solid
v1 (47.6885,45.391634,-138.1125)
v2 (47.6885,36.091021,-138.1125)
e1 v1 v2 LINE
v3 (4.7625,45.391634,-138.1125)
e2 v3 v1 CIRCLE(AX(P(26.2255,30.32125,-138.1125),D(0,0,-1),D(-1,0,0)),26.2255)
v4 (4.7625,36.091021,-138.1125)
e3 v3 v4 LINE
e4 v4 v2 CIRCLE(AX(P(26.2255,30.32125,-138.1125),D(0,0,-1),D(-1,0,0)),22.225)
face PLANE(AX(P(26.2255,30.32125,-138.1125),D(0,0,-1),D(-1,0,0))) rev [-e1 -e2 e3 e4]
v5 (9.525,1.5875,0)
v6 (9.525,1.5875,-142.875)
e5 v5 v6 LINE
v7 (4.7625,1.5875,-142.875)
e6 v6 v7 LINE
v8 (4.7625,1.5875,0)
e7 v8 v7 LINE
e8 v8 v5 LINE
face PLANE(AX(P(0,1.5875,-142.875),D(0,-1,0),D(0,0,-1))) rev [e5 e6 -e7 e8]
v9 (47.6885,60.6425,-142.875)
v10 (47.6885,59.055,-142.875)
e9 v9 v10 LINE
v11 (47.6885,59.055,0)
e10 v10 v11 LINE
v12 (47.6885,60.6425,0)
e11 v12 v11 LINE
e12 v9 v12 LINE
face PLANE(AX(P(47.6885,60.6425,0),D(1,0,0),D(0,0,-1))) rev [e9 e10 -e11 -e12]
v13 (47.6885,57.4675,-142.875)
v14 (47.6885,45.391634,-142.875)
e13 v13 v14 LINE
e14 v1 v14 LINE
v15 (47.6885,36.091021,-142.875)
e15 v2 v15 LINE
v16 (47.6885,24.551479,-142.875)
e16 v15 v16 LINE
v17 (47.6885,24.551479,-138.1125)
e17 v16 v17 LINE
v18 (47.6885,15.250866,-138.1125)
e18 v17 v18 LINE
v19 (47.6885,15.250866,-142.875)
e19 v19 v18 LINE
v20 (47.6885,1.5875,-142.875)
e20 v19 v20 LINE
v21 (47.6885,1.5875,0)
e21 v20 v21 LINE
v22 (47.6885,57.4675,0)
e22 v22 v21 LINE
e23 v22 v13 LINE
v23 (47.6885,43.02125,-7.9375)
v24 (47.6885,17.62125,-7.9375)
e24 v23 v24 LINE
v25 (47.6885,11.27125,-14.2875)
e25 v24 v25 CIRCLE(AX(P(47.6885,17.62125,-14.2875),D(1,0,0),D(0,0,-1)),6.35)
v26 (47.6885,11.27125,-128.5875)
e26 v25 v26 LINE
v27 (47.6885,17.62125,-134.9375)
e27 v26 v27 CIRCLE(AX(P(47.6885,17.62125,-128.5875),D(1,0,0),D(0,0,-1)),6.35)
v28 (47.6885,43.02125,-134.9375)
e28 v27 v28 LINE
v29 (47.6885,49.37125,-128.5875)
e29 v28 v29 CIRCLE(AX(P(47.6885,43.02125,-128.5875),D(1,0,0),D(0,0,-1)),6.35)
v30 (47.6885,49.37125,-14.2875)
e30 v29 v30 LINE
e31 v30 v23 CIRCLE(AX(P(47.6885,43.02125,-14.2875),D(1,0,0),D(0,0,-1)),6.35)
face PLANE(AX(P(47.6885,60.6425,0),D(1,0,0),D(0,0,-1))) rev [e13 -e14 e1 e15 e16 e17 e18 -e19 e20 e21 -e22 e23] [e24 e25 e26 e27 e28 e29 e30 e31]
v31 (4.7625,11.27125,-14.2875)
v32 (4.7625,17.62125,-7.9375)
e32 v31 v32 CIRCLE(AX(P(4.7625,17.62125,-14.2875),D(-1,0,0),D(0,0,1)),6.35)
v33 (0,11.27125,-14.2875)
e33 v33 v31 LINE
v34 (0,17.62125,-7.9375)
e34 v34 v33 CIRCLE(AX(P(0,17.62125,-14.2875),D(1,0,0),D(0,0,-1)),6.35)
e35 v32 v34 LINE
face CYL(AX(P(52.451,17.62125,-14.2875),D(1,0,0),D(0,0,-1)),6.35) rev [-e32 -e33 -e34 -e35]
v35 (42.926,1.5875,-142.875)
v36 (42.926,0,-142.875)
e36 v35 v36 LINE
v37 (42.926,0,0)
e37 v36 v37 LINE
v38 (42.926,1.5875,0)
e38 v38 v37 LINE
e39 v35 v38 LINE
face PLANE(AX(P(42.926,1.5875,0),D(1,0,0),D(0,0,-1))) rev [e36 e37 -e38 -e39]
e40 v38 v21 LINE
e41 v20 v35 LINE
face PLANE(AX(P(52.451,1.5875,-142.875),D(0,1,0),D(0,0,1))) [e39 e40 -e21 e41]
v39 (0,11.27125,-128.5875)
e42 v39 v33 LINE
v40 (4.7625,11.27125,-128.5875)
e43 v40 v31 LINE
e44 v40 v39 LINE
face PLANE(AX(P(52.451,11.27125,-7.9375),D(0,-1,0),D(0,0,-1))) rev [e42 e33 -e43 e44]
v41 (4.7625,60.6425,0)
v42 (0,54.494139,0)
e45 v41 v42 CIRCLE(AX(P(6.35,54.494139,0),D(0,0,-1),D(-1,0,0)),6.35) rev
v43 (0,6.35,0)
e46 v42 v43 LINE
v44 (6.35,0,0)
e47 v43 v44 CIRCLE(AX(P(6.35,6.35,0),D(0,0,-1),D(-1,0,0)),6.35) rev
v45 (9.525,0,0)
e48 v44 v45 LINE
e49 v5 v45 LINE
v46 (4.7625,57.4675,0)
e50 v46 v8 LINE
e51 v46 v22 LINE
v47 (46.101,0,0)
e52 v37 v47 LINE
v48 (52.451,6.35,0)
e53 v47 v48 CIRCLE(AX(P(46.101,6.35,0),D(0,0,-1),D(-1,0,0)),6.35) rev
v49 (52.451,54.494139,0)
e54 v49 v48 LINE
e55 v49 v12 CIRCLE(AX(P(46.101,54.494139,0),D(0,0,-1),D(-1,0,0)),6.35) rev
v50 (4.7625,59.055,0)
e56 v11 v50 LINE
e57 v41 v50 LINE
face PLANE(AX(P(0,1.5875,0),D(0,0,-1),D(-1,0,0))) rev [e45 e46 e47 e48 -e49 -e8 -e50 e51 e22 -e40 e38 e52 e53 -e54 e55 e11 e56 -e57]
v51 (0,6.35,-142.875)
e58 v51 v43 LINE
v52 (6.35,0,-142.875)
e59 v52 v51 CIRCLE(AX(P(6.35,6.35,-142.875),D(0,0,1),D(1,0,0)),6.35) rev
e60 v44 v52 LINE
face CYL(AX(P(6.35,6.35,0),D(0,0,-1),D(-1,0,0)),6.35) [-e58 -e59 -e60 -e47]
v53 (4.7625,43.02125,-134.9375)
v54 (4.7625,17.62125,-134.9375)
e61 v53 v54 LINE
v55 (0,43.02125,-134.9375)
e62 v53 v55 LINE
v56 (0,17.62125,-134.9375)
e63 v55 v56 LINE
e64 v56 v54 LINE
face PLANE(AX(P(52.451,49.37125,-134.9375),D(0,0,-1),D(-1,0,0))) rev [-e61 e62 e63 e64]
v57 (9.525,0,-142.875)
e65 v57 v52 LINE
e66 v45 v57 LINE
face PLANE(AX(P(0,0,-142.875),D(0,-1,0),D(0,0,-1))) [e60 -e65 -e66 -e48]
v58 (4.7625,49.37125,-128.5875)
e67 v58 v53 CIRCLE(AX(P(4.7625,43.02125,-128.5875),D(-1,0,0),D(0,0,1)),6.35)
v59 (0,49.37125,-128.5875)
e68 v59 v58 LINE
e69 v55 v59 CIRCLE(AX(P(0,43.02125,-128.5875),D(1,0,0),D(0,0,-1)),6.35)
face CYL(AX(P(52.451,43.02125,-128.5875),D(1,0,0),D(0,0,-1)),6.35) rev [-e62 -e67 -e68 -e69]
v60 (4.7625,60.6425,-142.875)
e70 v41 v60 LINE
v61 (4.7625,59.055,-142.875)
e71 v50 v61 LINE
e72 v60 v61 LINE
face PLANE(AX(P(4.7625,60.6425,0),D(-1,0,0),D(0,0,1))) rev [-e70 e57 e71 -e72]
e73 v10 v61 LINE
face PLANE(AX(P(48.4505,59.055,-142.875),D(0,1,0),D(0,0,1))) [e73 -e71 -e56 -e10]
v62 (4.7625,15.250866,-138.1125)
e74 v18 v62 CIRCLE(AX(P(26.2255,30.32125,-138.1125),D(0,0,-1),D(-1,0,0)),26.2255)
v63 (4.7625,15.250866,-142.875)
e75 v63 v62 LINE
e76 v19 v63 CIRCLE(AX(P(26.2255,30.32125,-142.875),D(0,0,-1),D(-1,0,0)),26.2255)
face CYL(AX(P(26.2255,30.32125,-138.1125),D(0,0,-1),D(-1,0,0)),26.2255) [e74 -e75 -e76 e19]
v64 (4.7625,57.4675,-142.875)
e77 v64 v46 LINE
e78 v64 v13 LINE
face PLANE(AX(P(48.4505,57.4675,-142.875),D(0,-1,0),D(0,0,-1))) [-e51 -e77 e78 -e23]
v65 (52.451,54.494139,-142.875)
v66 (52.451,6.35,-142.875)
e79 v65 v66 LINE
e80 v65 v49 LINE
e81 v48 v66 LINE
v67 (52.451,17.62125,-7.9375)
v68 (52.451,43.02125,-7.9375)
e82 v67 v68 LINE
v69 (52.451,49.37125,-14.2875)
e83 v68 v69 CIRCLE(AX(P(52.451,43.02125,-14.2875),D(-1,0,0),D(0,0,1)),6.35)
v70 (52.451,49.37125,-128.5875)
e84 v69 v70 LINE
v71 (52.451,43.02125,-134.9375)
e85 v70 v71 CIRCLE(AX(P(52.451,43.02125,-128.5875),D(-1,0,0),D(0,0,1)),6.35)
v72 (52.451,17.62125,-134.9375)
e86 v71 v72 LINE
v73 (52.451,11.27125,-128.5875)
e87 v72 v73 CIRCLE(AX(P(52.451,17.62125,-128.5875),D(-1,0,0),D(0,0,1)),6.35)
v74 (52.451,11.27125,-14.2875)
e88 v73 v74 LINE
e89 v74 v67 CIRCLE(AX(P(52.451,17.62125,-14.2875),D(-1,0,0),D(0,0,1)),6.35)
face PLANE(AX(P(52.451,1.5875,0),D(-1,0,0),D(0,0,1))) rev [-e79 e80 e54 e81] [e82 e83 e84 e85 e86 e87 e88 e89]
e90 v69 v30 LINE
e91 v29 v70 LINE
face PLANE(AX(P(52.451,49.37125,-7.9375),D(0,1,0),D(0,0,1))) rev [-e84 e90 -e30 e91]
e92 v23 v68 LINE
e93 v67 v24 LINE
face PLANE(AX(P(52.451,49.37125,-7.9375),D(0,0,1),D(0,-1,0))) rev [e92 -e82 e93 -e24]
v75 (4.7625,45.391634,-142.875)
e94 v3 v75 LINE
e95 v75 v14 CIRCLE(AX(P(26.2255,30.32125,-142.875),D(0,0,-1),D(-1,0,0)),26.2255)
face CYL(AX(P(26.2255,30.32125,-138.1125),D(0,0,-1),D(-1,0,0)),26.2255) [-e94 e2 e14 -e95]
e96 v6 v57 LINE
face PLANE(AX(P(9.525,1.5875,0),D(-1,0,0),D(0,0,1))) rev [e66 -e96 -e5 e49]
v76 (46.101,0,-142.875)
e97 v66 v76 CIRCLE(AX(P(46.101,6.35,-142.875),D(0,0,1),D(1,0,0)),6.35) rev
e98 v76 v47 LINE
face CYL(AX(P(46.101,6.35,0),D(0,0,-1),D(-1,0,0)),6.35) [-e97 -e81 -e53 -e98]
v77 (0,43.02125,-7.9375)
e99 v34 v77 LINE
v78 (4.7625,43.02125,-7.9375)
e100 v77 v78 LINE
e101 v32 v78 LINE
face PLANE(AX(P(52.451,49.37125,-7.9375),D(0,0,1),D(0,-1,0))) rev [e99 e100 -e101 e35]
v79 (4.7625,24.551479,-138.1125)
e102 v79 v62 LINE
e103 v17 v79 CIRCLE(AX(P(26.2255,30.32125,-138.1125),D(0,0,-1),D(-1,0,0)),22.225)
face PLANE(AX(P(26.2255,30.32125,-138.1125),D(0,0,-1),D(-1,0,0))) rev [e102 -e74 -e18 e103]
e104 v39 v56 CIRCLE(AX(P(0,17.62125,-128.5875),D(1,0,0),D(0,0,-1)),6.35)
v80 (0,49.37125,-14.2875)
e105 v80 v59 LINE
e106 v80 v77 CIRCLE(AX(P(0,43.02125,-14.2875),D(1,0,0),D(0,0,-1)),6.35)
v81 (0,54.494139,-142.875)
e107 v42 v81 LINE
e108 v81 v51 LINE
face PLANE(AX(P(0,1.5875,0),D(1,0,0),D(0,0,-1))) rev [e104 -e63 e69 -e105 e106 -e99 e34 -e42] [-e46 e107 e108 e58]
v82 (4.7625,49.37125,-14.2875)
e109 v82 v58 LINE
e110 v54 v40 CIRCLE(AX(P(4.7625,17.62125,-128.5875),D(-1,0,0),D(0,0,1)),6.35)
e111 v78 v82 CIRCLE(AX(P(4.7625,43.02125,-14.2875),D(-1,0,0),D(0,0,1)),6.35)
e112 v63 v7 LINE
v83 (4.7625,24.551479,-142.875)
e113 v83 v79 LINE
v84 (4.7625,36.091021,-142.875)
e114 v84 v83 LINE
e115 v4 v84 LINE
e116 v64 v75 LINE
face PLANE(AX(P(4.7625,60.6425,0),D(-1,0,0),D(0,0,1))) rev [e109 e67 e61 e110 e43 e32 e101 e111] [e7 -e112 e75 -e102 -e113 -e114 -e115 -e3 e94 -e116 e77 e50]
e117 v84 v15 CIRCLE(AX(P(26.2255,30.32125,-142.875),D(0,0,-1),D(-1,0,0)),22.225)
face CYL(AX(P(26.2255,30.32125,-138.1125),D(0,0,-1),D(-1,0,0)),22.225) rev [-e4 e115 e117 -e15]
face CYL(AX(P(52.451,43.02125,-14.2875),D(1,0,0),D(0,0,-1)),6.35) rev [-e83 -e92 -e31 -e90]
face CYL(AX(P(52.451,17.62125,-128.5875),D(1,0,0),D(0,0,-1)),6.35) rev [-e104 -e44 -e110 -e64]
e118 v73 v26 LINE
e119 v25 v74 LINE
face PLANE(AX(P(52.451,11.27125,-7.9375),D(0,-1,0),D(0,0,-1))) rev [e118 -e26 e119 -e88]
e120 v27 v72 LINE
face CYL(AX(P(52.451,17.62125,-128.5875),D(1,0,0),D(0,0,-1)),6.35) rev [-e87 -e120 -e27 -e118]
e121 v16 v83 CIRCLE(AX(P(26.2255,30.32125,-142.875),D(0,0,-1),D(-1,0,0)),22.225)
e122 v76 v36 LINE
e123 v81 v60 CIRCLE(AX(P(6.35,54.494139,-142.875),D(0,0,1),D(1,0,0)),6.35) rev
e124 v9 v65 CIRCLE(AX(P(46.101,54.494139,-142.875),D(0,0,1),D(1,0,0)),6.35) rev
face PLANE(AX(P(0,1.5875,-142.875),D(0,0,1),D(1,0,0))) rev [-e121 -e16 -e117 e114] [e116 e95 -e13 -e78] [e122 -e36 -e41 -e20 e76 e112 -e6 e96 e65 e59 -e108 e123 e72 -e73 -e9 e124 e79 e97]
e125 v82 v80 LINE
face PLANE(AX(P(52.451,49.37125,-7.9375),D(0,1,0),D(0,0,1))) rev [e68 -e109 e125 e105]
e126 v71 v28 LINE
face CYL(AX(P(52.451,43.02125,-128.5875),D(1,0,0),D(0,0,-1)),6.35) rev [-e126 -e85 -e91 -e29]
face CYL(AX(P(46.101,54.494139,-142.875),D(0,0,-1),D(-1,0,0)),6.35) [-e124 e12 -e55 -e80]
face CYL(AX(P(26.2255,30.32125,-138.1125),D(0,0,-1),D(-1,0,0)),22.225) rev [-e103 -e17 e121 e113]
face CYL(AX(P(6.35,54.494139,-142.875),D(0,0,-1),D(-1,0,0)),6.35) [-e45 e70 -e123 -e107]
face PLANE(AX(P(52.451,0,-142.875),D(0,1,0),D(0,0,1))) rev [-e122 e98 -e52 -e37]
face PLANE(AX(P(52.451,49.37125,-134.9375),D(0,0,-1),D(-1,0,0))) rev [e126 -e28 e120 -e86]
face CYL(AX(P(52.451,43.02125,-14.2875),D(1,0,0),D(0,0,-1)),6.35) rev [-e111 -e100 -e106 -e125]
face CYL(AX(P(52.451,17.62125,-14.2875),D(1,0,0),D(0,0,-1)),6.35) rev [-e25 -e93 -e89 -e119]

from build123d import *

# Parameters (mm, degrees)
SKETCH1_W             = 9.525
SKETCH1_H             = 142.875
BOSS_EXTRUDE1_DEPTH   = 1.5875
BOSS_EXTRUDE1_2_DEPTH = 1.5875
SKETCH2_W             = 4.7625
SKETCH2_H             = 142.875
BOSS_EXTRUDE2_DEPTH   = 59.055
SKETCH3_W             = 127
SKETCH3_H             = 38.1
CUT_EXTRUDE1_DEPTH    = 164.834934713
SKETCH4_R             = 26.2255
SKETCH4_R_2           = 22.225
BOSS_EXTRUDE3_DEPTH   = 4.7625
FILLET1_R             = 6.35
FILLET4_R             = 6.35
SKETCH5_W             = 44.45
SKETCH5_H             = 1.5875
BOSS_EXTRUDE4_DEPTH   = 142.875


with BuildPart() as part:
    # Sketch1 → Boss-Extrude1 (new body)
    with BuildSketch(Plane(origin=(0, 0, 0), x_dir=(1, 0, 0), z_dir=(0, 1, 0))):
        with Locations((4.7625, 71.4375)):
            Rectangle(SKETCH1_W, SKETCH1_H)
    extrude(amount=BOSS_EXTRUDE1_DEPTH)



with BuildPart() as body_2:
    # Sketch1 → Boss-Extrude1 2 (new body)
    with BuildSketch(Plane(origin=(0, 0, 0), x_dir=(1, 0, 0), z_dir=(0, 1, 0))):
        with Locations((47.6885, 71.4375)):
            Rectangle(SKETCH1_W, SKETCH1_H)
    extrude(amount=BOSS_EXTRUDE1_2_DEPTH)


with BuildPart() as part_1:
    add(part.part)

    add(body_2.part)  # Boss-Extrude2 merges body 2
    # Sketch2 → Boss-Extrude2 (add)
    with BuildSketch(Plane(origin=(0, 1.5875, 0), x_dir=(1, 0, 0), z_dir=(0, 1, 0))):
        with Locations((2.38125, 71.4375)):
            Rectangle(SKETCH2_W, SKETCH2_H)
        with Locations((50.06975, 71.4375)):
            Rectangle(SKETCH2_W, SKETCH2_H)
    extrude(amount=BOSS_EXTRUDE2_DEPTH)

    # Sketch3 → Cut-Extrude1 (cut, through all)
    with BuildSketch(Plane.ZY):
        with Locations((-71.4375, 30.32125)):
            Rectangle(SKETCH3_W, SKETCH3_H)
    extrude(amount=-CUT_EXTRUDE1_DEPTH, mode=Mode.SUBTRACT)

    # Sketch4 → Boss-Extrude3 (add)
    with BuildSketch(Plane(origin=(0, 0, -142.875), x_dir=(-1, 0, 0), z_dir=(0, 0, -1))):
        with Locations((-26.2255, 30.32125)):
            Circle(SKETCH4_R)
        with Locations((-26.2255, 30.32125)):
            Circle(SKETCH4_R_2, mode=Mode.SUBTRACT)
    extrude(amount=-BOSS_EXTRUDE3_DEPTH)

    # Fillet1
    # the kernel refuses this fillet: 6.35 mm, written as the material it takes off along each edge
    with BuildSketch(Plane(origin=(52.451, 0, -158.75), x_dir=(0, 1, 0), z_dir=(0, 0, 1)), Plane(origin=(0, 0, -158.75), x_dir=(1, 0, 0), z_dir=(0, 0, 1))) as fillet1_piece_1:
        with BuildLine():
            CenterArc((FILLET1_R, FILLET1_R), FILLET1_R, 180, 90)
            Line((0, FILLET1_R), (-FILLET1_R * 0.02, FILLET1_R))
            Line((-FILLET1_R * 0.02, FILLET1_R), (-FILLET1_R * 0.02, -FILLET1_R * 0.02))
            Line((-FILLET1_R * 0.02, -FILLET1_R * 0.02), (FILLET1_R, -FILLET1_R * 0.02))
            Line((FILLET1_R, -FILLET1_R * 0.02), (FILLET1_R, 0))
        make_face()
    extrude(amount=174.625, mode=Mode.SUBTRACT)
    with BuildSketch(Plane(origin=(0, 60.6425, -158.245902655), x_dir=(1, 0, 0), z_dir=(0, 0, 1))) as fillet1_piece_2:
        with BuildLine():
            CenterArc((6.35, -6.148361062), FILLET1_R, 104.477512186, 75.522487814)
            Line((0, -6.148361062), (-0.127, -6.148361062))
            Line((-0.127, -6.148361062), (-0.127, 0))
            Line((-0.127, 0), (0, 0.127))
            ThreePointArc((0, 0.127), (2.38125, 0.127), (4.73075, 0.122967221))
            Line((4.73075, 0.122967221), (4.7625, 0))
        make_face()
    extrude(amount=173.616805311, mode=Mode.SUBTRACT)
    with BuildSketch(Plane(origin=(52.451, 60.6425, -158.245902655), x_dir=(0, -1, 0), z_dir=(0, 0, 1))) as fillet1_piece_3:
        with BuildLine():
            CenterArc((6.148361062, -6.35), FILLET1_R, 90, 75.522487814)
            Line((0, -4.7625), (-0.122967221, -4.73075))
            ThreePointArc((-0.122967221, -4.73075), (-0.127, -2.38125), (-0.127, 0))
            Line((-0.127, 0), (0, 0.127))
            Line((0, 0.127), (6.148361062, 0.127))
            Line((6.148361062, 0.127), (6.148361062, 0))
        make_face()
    extrude(amount=173.616805311, mode=Mode.SUBTRACT)

    # Fillet4
    fillet4_edges = [part_1.edges().sort_by_distance(p)[0] for p in [
        (2.38125, 11.27125, -134.9375),
        (2.38125, 49.37125, -134.9375),
        (2.38125, 49.37125, -7.9375),
        (2.38125, 11.27125, -7.9375),
        (50.06975, 49.37125, -134.9375),
        (50.06975, 49.37125, -7.9375),
        (50.06975, 11.27125, -7.9375),
        (50.06975, 11.27125, -134.9375),
    ]]
    fillet(fillet4_edges, radius=FILLET4_R)

    # Sketch5 → Boss-Extrude4 (add)
    with BuildSketch(Plane.XY):
        with Locations((26.2255, 58.26125)):
            Rectangle(SKETCH5_W, SKETCH5_H)
    extrude(amount=-BOSS_EXTRUDE4_DEPTH)


solid = part_1.part
